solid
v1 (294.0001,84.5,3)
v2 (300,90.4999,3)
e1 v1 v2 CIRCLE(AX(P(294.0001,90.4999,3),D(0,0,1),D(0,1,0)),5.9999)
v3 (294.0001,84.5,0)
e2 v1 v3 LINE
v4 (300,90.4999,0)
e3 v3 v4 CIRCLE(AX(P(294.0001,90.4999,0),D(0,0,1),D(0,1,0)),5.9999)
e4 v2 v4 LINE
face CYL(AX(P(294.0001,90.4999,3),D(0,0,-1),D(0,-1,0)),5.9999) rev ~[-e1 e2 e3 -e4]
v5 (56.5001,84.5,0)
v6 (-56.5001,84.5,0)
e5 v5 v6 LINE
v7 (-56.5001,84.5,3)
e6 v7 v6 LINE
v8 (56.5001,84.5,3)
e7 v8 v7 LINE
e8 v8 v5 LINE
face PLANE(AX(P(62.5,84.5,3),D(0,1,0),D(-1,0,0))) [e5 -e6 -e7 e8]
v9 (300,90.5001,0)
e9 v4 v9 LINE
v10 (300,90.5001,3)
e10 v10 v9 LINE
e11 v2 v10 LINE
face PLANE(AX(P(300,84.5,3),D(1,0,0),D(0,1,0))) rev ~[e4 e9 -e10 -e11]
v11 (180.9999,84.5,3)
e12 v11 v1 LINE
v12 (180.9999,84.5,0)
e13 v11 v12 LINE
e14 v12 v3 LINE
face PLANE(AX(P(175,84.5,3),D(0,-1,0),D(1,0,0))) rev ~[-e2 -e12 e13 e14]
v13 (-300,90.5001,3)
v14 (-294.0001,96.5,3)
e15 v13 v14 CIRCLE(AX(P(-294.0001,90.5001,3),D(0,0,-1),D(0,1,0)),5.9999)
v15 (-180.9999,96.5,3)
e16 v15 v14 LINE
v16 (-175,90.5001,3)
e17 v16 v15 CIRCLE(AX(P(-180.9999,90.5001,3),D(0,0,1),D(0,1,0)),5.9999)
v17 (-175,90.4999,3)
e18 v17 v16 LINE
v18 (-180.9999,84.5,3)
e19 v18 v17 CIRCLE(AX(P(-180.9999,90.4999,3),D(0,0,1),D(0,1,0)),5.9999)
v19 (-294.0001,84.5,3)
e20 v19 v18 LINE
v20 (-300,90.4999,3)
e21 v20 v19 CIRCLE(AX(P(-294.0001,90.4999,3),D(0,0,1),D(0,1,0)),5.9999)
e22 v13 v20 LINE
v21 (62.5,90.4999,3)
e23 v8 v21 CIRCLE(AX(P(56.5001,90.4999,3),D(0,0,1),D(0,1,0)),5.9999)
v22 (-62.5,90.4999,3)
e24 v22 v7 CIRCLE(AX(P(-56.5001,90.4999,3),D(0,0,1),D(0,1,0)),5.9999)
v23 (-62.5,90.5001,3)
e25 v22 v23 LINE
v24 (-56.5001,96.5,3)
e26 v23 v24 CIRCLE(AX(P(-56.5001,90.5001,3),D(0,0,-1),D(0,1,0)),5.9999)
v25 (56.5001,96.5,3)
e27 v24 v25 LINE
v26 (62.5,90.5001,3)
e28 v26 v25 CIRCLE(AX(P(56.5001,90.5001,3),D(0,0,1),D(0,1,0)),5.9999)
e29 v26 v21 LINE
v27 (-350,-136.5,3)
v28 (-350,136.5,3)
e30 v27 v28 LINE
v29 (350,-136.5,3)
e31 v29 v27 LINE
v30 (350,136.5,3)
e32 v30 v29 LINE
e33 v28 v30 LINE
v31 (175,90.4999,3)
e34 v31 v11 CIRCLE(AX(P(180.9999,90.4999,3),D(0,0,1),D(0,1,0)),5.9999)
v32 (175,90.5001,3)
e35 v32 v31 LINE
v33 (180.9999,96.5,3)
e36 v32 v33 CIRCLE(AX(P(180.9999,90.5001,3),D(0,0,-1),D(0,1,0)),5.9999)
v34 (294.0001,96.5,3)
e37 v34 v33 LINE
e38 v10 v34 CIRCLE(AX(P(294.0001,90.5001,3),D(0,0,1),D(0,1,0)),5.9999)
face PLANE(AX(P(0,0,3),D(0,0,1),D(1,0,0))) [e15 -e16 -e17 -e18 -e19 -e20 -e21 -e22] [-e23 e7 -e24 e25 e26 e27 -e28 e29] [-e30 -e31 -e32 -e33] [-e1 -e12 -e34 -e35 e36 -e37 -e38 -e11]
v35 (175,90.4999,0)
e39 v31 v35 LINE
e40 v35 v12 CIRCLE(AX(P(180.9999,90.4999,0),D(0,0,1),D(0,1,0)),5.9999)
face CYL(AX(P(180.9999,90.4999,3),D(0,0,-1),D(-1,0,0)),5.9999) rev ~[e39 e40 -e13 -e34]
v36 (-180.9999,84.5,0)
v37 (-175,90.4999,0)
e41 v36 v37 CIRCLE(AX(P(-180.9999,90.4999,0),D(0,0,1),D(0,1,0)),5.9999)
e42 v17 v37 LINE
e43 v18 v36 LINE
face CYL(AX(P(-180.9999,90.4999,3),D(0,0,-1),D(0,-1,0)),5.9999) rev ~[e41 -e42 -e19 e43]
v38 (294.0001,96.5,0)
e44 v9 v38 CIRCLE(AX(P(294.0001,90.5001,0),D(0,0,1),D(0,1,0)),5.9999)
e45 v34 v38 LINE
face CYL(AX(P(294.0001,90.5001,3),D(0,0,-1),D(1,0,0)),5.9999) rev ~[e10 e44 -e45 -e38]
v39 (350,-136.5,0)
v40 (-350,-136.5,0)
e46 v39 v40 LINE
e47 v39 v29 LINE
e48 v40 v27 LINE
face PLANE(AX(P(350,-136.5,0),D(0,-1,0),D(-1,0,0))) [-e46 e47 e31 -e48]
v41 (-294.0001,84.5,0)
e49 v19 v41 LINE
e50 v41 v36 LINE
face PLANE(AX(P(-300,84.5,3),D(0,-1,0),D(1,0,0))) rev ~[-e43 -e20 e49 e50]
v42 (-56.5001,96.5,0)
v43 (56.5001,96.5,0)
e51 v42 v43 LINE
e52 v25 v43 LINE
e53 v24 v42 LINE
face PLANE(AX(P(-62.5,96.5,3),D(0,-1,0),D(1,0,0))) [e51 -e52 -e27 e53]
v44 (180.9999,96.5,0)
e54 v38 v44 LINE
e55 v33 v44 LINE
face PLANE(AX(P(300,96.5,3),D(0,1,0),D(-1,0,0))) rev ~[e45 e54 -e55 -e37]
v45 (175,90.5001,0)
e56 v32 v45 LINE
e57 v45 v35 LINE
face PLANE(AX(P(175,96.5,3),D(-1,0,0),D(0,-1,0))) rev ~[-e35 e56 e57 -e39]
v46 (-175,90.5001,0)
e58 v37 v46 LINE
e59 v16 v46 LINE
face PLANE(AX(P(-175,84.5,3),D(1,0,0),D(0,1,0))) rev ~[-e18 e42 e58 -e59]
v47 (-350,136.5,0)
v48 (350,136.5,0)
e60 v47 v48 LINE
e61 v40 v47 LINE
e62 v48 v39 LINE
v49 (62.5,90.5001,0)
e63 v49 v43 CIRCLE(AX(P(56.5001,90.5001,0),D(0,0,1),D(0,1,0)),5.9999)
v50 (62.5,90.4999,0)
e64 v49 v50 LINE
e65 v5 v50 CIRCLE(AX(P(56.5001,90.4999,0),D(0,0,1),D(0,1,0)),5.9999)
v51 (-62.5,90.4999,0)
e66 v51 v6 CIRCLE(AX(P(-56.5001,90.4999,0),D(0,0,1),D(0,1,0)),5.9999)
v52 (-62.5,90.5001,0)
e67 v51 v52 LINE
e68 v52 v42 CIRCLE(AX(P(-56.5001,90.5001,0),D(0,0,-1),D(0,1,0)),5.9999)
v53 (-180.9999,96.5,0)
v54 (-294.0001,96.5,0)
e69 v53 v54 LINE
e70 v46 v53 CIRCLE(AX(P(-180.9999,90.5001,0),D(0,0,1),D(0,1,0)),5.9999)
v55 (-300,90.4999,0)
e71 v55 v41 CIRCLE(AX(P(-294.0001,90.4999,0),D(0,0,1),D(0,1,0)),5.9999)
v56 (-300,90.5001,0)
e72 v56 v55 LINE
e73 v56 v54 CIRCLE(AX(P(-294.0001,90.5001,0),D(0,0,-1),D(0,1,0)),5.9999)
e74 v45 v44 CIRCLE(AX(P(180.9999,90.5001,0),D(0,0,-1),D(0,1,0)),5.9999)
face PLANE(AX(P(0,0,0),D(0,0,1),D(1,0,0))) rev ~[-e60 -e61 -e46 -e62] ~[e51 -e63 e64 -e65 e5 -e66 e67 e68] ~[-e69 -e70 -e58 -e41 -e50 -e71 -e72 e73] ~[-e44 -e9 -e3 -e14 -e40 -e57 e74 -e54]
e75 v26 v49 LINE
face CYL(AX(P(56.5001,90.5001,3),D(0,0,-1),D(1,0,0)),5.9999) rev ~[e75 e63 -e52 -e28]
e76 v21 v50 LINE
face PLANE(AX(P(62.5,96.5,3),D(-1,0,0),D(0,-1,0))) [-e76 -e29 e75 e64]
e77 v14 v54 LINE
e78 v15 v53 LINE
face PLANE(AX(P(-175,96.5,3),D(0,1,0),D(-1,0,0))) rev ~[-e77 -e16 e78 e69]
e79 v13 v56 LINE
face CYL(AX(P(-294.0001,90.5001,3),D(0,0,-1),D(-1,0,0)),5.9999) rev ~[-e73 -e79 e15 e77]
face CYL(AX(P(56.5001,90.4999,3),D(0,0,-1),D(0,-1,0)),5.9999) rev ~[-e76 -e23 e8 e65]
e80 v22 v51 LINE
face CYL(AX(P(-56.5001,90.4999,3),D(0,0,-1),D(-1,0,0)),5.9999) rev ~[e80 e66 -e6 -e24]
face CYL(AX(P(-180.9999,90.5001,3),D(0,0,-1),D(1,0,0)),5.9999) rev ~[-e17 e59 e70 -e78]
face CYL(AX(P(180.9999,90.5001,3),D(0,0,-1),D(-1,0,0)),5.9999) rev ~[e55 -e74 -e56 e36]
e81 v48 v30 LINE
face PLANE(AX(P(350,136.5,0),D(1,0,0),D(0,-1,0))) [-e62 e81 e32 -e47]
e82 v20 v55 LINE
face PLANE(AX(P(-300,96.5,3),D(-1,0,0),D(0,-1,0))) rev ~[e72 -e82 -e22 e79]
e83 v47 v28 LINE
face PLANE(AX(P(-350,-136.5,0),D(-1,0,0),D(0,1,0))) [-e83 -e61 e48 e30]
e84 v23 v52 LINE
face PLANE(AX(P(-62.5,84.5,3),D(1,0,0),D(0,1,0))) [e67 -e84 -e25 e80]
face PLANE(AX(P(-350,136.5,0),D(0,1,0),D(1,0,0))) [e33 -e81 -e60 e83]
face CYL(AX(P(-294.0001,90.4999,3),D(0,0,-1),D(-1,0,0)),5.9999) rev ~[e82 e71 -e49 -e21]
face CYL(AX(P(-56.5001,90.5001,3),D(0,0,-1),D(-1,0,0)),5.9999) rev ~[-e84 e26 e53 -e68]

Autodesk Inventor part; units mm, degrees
ref_plane "YZ Plane" through (0, 0, 0) normal (1, 0, 0) x (0, 1, 0)
ref_plane "XZ Plane" through (0, 0, 0) normal (0, 1, 0) x (-1, 0, 0)
ref_plane "XY Plane" through (0, 0, 0) normal (0, 0, 1) x (1, 0, 0)
sketch "Sketch1" plane through (0, 0, 0) normal (0, 0, 1) x (1, 0, 0)
  line L0 (350, -136.5) -> (-350, -136.5)
  line L1 (-350, -136.5) -> (-350, 136.5)
  line L2 (-350, 136.5) -> (350, 136.5)
  line L3 (350, 136.5) -> (350, -136.5)
  line L4 (350, -136.5) -> (-350, 136.5) construction
  line L5 (-350, -136.5) -> (350, 136.5) construction
  point P0 (0, 0)
  dimension "d0" = 273
  dimension "d1" = 700
extrude "Extrusion1" add sketch "Sketch1" along normal blind 3
sketch "Sketch5" plane through (0, 0, 3) normal (0, 0, 1) x (1, 0, 0)
  line L0 (-300, 84.5) -> (-175, 84.5)
  line L1 (-175, 84.5) -> (-175, 96.5)
  line L2 (-175, 96.5) -> (-300, 96.5)
  line L3 (-300, 96.5) -> (-300, 84.5)
  line L4 (-62.5, 96.5) -> (62.5, 96.5)
  line L5 (62.5, 96.5) -> (62.5, 84.5)
  line L6 (62.5, 84.5) -> (-62.5, 84.5)
  line L7 (-62.5, 84.5) -> (-62.5, 96.5)
  line L8 (350, 136.5) -> (-350, 136.5) projected
  line L9 (175, 84.5) -> (300, 84.5)
  line L10 (300, 84.5) -> (300, 96.5)
  line L11 (300, 96.5) -> (175, 96.5)
  line L12 (175, 96.5) -> (175, 84.5)
  line L13 (-350, 136.5) -> (-350, -136.5) projected
  point P0 (0, 0)
  dimension "d21" = 12
  dimension "d29" = 40
  dimension "d30" = 40
  dimension "d33" = 40
  dimension "d35" = 50
  dimension "d36" = 50
  dimension "d37" = 112.5
  dimension "d38" = 112.5
  dimension "d41" = 12
  dimension "d42" = 12
extrude "Extrusion5" cut sketch "Sketch5" against normal blind 10
fillet "Fillet5" radius 6 4 edges at (-300, 96.5, 1.5) (-300, 84.5, 1.5) (-175, 84.5, 1.5) (-175, 96.5, 1.5)
fillet "Fillet6" radius 6 8 edges at (-62.5, 96.5, 1.5) (-62.5, 84.5, 1.5) (62.5, 96.5, 1.5) (62.5, 84.5, 1.5) (175, 96.5, 1.5) (175, 84.5, 1.5) (300, 96.5, 1.5) (300, 84.5, 1.5)
equation "\"d30\" = d29"
equation "\"d33\" = d29"
equation "\"d41\" = d21"
equation "\"d42\" = d21"
equation "\"d40\" = 0.5 * d21"
equation "\"d43\" = 0.5 * d21"
properties part number "GBX_021.1-front-PMMA"
